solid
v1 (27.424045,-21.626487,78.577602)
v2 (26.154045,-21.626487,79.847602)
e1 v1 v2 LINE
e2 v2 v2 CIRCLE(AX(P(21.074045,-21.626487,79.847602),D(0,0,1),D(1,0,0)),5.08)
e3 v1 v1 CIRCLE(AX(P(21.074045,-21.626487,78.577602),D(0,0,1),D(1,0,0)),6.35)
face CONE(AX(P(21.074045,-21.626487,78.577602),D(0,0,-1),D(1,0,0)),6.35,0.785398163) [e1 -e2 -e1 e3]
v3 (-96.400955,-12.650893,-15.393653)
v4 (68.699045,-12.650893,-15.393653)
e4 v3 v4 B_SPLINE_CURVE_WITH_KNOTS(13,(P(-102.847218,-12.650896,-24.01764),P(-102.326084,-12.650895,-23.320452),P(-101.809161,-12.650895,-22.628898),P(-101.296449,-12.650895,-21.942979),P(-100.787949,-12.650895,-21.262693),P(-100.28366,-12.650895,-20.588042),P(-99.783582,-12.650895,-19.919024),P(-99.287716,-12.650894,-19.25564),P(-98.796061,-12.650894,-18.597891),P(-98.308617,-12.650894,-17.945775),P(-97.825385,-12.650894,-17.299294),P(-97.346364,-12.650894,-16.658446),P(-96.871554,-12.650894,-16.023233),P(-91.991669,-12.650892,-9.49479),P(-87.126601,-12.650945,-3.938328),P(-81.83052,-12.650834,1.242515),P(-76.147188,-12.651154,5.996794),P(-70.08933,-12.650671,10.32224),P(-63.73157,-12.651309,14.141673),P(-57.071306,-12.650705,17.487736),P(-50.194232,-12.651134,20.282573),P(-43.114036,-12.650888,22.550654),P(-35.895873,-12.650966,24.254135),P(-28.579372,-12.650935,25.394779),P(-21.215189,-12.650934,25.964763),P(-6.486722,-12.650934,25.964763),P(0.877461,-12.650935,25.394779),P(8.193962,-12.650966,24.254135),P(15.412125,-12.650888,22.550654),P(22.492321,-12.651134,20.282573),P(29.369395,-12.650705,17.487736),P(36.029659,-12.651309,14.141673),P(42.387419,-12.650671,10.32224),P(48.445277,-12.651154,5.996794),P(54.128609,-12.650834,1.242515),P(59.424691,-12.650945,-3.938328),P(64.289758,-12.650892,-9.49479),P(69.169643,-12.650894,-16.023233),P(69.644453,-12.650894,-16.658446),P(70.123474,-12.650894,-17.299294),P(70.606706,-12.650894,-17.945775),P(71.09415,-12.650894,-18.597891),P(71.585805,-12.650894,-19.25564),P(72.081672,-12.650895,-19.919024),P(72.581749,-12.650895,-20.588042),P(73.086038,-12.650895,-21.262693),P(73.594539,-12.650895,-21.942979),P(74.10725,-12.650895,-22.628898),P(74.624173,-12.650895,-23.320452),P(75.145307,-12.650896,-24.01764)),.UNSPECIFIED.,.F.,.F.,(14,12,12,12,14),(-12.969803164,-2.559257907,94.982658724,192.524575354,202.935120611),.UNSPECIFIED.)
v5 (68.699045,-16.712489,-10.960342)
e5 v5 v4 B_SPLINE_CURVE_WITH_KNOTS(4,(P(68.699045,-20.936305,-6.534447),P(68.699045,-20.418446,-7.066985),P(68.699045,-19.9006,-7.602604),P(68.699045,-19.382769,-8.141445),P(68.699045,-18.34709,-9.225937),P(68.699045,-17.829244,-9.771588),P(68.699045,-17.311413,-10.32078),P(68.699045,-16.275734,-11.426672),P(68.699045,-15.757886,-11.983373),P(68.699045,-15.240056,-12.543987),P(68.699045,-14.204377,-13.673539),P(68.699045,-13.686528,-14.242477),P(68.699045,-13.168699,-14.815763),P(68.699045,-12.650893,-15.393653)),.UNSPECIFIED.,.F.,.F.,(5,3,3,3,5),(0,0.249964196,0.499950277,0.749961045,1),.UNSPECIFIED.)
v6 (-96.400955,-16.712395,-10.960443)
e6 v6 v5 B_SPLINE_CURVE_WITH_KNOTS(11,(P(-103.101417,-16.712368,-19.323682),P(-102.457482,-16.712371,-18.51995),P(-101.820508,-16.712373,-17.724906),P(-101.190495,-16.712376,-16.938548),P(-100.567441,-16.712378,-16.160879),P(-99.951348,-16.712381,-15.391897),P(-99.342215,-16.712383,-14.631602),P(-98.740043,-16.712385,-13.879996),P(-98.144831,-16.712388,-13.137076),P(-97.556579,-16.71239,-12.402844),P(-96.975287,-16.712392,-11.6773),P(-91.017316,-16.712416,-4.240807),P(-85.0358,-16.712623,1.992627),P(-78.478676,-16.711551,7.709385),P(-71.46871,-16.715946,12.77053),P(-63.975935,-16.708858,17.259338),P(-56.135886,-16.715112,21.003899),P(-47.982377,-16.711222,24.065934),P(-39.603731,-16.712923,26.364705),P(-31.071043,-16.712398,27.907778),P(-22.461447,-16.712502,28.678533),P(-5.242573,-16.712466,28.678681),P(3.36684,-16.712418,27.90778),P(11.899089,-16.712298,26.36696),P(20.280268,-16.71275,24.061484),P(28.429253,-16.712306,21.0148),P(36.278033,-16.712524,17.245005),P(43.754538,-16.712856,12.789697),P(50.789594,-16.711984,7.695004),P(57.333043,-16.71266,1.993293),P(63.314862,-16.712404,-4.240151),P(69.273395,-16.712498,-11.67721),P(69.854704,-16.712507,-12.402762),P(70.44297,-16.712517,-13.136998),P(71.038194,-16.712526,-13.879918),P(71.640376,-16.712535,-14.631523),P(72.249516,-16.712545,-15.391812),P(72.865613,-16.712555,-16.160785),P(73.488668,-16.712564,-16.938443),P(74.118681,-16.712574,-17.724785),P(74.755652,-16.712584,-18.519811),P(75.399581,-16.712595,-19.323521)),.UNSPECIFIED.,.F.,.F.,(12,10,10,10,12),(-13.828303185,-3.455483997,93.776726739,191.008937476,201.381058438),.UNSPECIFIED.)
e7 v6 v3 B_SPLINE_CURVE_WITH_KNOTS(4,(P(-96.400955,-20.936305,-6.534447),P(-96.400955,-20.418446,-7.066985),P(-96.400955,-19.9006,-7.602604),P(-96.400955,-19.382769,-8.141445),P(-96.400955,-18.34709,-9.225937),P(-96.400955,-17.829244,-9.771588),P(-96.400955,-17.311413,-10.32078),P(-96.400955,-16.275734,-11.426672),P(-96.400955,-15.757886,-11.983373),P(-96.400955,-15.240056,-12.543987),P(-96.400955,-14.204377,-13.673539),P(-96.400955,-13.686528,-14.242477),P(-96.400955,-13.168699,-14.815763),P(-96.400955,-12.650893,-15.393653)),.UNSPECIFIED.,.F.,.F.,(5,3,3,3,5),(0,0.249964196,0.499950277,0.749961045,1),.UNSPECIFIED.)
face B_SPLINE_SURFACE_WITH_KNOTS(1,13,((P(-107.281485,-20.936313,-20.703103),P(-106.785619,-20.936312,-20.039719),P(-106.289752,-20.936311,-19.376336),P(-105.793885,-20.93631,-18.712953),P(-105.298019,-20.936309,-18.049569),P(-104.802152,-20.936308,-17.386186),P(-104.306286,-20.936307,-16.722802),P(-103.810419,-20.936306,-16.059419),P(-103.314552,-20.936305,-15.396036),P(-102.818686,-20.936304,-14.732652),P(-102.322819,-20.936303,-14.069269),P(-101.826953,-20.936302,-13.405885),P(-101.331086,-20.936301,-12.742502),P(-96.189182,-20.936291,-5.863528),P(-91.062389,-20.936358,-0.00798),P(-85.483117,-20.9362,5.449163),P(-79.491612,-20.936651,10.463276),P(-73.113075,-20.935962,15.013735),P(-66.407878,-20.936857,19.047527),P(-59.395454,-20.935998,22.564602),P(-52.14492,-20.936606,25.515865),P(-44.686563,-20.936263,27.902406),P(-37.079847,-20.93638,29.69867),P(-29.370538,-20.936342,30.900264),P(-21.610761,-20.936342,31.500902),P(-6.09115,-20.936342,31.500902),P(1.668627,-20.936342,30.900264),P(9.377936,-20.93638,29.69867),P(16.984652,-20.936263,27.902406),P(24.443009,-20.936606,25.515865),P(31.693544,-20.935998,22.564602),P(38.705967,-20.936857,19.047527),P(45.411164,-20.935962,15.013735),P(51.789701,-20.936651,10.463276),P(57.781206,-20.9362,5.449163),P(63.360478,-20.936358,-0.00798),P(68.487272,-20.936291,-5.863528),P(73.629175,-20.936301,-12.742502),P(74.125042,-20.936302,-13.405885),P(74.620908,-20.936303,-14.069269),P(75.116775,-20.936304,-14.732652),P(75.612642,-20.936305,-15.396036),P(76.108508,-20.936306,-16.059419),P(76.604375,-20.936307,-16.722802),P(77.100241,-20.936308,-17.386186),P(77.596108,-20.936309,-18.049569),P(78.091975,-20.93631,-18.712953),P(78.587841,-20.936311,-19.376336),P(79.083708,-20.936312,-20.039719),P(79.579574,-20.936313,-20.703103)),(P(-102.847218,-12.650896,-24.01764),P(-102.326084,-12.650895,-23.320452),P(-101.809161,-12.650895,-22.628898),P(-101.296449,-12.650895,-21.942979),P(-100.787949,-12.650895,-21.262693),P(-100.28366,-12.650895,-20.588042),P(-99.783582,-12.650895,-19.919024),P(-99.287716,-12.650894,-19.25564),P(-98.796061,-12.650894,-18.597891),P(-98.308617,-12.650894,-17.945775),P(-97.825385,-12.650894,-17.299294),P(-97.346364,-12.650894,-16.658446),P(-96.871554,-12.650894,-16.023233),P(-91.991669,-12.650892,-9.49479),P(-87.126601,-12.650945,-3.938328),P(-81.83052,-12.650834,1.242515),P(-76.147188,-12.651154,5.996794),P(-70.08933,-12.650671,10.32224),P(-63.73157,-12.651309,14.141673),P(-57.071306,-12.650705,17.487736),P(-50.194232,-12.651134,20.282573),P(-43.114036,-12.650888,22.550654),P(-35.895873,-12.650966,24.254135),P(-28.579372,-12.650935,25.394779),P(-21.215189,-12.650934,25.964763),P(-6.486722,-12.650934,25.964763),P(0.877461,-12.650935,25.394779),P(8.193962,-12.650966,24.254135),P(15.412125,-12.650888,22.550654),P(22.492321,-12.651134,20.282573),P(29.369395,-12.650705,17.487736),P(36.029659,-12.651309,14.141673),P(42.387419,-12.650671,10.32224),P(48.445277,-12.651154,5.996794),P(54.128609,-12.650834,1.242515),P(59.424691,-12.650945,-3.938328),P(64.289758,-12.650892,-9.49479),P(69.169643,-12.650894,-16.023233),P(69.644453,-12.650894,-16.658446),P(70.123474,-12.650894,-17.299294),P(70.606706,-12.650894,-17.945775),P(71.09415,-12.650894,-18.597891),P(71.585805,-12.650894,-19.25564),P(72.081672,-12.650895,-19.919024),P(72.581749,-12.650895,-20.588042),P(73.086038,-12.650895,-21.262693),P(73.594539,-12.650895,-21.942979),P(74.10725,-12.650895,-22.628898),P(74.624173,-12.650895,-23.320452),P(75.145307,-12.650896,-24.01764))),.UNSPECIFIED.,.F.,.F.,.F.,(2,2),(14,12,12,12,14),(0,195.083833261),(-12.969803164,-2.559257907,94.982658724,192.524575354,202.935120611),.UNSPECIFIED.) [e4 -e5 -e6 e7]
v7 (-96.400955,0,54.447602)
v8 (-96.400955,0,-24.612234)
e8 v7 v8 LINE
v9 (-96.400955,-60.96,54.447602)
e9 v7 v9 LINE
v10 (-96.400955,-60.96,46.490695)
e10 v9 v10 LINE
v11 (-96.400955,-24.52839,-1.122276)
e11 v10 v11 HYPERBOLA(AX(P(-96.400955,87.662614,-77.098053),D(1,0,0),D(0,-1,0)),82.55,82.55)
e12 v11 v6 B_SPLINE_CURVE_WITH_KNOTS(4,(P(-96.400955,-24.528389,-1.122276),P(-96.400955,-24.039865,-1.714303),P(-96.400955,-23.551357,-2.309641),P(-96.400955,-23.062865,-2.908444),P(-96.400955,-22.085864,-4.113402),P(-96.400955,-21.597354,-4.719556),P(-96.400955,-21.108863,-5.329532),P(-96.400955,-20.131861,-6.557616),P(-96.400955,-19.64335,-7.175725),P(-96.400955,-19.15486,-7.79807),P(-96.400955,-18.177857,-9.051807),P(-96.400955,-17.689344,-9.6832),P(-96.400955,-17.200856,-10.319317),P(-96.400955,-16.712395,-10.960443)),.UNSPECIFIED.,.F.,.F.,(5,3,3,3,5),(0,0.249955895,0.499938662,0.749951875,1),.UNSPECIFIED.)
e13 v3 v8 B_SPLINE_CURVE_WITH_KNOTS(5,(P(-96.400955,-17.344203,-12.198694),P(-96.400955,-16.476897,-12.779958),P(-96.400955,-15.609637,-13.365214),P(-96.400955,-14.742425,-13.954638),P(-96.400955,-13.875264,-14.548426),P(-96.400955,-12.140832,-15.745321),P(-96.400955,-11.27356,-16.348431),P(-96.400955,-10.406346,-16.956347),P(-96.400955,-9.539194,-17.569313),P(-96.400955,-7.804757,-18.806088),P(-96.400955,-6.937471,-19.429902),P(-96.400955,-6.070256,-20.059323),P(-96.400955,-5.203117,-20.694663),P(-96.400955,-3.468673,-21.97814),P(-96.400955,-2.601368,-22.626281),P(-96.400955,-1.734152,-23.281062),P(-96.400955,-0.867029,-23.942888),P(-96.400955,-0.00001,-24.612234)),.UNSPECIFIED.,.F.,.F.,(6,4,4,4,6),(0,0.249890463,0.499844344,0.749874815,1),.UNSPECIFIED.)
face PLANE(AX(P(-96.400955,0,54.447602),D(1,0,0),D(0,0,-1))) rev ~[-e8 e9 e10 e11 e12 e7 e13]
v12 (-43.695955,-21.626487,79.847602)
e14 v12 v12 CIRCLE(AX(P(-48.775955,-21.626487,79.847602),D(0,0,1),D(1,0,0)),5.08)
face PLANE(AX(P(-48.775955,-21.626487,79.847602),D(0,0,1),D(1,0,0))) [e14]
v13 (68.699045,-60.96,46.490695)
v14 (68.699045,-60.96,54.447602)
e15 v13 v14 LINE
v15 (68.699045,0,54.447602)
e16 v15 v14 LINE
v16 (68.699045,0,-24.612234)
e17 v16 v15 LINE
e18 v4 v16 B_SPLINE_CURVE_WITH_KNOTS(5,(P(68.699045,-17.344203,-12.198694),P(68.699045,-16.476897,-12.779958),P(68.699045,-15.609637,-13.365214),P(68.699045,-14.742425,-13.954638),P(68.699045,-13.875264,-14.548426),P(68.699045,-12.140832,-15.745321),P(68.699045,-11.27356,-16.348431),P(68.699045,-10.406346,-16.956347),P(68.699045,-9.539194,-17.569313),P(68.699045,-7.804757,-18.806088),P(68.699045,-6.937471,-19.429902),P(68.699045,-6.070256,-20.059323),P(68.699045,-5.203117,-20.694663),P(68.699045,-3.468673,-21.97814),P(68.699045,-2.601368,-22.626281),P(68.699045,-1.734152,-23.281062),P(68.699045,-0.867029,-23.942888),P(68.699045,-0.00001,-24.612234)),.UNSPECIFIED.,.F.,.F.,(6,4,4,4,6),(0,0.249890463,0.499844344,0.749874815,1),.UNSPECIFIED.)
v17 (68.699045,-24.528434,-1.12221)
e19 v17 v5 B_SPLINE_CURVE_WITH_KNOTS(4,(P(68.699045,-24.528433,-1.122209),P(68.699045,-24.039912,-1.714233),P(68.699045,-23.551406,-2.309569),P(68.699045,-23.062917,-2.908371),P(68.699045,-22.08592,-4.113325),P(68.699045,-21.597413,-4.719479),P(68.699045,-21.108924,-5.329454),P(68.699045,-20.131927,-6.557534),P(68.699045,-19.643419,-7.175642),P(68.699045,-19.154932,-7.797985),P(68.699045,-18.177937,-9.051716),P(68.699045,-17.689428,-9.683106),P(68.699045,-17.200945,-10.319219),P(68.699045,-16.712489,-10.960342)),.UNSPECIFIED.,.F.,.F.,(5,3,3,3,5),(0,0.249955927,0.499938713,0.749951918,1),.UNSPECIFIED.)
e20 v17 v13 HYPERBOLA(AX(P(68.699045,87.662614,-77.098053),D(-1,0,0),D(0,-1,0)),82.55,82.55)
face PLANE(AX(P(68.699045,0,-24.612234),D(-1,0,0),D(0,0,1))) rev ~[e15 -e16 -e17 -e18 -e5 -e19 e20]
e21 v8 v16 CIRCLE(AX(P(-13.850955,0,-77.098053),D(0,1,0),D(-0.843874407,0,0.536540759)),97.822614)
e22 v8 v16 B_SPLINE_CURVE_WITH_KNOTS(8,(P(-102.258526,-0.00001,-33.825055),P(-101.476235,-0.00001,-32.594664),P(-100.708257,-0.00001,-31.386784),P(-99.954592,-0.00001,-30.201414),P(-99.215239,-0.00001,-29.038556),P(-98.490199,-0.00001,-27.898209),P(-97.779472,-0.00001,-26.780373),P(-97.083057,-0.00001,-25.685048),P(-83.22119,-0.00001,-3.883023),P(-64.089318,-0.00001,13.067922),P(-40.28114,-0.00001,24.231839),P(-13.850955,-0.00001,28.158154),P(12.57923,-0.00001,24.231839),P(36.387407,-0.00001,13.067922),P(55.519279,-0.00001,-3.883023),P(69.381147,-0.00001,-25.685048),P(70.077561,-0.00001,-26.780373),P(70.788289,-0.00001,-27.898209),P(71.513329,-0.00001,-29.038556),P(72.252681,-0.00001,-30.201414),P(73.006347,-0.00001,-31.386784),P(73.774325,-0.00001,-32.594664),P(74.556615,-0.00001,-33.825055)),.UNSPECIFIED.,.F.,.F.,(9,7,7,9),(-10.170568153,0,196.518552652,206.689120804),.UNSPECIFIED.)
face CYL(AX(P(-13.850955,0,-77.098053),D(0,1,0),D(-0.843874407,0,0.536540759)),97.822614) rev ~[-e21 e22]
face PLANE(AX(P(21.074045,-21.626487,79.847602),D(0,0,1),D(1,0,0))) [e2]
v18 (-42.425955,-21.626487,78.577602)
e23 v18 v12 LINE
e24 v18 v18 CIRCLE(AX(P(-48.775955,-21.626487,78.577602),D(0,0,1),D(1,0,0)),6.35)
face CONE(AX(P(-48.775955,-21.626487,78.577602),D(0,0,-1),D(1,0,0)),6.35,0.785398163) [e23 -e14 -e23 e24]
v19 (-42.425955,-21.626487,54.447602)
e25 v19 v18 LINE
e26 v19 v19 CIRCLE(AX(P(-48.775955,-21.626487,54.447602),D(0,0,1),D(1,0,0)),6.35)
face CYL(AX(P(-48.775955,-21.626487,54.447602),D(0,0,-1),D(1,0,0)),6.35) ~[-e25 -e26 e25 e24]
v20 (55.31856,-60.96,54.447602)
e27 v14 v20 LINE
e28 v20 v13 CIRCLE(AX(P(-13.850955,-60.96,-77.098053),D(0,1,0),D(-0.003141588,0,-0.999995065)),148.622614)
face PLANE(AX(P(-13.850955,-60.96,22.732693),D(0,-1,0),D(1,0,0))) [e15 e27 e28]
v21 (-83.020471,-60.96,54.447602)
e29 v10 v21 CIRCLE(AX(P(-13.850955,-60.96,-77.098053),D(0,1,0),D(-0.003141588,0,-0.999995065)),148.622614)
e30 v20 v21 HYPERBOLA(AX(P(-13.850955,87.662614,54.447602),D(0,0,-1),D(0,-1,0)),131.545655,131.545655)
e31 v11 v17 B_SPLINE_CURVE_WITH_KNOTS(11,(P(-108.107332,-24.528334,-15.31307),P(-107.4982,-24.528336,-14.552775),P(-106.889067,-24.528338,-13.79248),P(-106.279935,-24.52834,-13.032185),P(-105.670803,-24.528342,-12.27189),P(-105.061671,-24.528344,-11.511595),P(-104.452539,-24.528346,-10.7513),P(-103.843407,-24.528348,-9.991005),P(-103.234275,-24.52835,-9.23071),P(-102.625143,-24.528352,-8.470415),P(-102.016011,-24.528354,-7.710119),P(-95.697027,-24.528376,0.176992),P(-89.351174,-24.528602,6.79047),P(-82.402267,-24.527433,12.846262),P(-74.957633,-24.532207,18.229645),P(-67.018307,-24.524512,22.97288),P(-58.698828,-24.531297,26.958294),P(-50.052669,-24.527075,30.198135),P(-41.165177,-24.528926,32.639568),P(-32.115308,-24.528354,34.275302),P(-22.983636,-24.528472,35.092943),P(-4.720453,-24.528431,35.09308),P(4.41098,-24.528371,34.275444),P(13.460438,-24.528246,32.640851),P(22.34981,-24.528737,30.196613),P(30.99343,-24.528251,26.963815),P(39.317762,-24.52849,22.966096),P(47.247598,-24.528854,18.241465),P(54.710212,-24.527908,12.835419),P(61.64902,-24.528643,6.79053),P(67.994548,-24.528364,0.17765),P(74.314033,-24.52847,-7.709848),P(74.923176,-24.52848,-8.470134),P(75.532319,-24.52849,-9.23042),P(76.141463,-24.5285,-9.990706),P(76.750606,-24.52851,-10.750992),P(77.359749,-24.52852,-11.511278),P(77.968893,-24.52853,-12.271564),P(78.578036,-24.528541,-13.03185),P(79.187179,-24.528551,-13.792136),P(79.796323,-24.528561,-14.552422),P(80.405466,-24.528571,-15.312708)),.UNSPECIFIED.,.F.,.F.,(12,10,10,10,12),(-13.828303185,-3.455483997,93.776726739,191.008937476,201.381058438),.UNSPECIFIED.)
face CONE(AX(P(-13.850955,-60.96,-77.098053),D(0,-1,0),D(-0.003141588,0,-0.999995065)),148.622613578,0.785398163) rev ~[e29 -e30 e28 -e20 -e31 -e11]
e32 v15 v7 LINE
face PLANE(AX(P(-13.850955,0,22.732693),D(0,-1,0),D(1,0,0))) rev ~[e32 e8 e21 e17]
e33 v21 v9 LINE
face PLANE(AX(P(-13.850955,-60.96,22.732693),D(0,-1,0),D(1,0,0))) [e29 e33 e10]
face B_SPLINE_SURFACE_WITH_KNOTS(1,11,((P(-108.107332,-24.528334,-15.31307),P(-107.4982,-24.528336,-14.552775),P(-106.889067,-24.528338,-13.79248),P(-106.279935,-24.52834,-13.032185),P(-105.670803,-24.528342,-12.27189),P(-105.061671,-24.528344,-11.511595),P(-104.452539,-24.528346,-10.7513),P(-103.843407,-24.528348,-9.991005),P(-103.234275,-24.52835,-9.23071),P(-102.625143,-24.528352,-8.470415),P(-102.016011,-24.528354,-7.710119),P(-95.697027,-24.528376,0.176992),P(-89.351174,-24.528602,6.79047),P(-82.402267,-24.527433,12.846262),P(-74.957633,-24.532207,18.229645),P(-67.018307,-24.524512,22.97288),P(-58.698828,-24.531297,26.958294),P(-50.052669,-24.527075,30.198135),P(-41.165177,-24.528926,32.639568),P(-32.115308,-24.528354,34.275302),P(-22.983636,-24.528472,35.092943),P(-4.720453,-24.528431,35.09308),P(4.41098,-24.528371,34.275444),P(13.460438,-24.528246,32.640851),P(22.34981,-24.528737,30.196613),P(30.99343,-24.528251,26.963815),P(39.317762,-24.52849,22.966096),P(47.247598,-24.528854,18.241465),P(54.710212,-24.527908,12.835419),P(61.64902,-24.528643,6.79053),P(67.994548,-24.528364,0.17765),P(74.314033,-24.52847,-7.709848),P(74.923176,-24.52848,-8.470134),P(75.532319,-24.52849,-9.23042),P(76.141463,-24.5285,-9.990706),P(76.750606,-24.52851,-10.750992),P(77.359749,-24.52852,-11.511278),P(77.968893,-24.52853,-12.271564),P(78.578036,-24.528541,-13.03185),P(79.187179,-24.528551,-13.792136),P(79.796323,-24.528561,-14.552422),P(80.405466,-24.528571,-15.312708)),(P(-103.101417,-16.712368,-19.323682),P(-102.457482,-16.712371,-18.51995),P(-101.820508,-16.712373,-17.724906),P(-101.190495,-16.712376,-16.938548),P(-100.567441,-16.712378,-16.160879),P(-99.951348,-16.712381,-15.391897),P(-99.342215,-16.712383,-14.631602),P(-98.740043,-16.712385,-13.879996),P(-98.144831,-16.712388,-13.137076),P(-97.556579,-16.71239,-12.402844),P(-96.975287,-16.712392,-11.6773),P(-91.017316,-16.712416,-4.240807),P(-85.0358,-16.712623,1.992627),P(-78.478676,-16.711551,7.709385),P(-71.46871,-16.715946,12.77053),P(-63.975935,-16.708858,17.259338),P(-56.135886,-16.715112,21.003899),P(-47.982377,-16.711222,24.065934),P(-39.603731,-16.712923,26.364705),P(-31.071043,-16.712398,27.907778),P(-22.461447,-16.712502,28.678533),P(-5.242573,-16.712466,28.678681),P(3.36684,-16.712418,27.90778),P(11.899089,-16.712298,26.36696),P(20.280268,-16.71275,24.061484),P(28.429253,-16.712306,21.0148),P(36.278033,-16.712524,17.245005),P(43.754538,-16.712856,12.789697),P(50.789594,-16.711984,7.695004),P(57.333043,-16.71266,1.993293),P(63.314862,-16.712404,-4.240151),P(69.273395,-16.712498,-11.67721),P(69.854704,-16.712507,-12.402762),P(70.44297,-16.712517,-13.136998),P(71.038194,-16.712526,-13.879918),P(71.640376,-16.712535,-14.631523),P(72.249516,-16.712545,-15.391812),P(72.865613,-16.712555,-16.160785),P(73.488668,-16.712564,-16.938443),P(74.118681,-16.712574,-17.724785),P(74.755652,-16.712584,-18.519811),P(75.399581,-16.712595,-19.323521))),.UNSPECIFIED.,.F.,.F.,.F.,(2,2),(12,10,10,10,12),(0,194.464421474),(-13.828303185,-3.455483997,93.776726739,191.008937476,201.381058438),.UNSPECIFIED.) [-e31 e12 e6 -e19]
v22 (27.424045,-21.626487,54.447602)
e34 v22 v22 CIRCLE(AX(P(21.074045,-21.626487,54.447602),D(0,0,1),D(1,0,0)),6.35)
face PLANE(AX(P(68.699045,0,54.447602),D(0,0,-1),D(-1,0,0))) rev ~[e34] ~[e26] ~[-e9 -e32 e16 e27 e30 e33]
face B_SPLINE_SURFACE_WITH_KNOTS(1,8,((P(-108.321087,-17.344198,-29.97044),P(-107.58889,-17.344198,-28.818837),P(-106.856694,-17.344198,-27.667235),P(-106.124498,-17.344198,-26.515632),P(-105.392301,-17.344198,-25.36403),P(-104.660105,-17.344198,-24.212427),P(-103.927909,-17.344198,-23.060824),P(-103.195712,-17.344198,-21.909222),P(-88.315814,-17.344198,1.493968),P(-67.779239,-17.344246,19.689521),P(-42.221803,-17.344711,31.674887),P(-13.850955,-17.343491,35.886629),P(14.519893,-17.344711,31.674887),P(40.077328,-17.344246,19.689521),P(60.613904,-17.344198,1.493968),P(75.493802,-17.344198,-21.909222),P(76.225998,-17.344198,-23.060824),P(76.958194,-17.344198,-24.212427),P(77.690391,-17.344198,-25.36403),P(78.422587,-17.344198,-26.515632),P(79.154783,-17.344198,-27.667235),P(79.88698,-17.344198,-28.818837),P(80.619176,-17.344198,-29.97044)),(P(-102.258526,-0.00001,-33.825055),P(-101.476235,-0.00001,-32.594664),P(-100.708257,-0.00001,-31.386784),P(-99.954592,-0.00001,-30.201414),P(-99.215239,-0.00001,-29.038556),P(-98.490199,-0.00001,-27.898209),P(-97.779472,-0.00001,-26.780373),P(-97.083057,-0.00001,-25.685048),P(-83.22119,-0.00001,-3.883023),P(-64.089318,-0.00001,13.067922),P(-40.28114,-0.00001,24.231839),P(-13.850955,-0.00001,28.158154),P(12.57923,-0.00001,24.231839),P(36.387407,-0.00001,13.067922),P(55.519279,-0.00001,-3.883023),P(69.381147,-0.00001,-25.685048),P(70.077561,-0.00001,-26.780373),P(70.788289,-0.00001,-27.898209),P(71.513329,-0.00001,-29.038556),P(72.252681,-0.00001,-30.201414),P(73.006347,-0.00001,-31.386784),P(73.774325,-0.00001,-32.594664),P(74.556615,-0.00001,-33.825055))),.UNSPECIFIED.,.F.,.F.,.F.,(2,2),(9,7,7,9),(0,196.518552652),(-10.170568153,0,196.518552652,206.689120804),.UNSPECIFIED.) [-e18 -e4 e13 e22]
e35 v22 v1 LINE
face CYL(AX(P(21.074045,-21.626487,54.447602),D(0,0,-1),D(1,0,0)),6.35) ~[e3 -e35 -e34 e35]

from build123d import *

# Parameters (mm, degrees)
F1_DEPTH    = 60.96
F2_T2_ANGLE = 359.64
F3_SIZE     = 10.15999
F4_R        = 6.35
F5_DEPTH    = 25.4
F6_SIZE     = 1.27
F7_SIZE     = 5.08
F8_SIZE     = 5.08


# Not quite as in the source:
# - a fillet or chamfer that OpenCascade refuses, or shapes differently, is made with other operations: its cross-section is extruded or revolved along the edge and cut away or added
# - a fillet or chamfer is up to 0.001 mm smaller than in the source, because OpenCascade refuses the exact size


with BuildPart() as f1:
    # F0 (on Front) → F1 (new body)
    with BuildSketch(Plane.XZ):
        with BuildLine():
            Line((68.6990445861, 54.4476021031), (0, 54.4476021031))
            Line((0, 54.4476021031), (-96.4009554139, 54.4476021031))
            Line((-96.4009554139, 54.4476021031), (-96.4009554139, -24.6122339721))
            ThreePointArc((-96.4009554139, -24.6122339721), (-13.8509554139, 20.7245603096), (68.6990445861, -24.6122339721))
            Line((68.6990445861, -24.6122339721), (68.6990445861, 54.4476021031))
        make_face()
    extrude(amount=F1_DEPTH)

    # F2: chamfer of 50.8 on 1 edges, made by hand

    # F2_s1 → F2_t2 (revolve, cut)
    with BuildSketch(Plane(origin=(-13.6086096269, 0, 0.0427528487), x_dir=(0, 1, 0), z_dir=(0.9999950652, 0, -0.0031415875))):
        Polygon((-60.96, -225.7638003707), (-10.16, -174.9638003707), (-60.96, -174.9638003707), align=None)
    revolve(axis=Axis((-13.8509554139, -60.96, -77.0980532681), (0, 1, 0)), revolution_arc=F2_T2_ANGLE, mode=Mode.SUBTRACT)

    # F3 (size 10.16 in the source; OpenCascade refuses exactly that, so slightly less here)
    f3_edges = [f1.edges().sort_by_distance(p)[0] for p in [
        (-13.850955, -10.16, 20.72456),
    ]]
    chamfer(f3_edges, length=F3_SIZE)

    # F4 (on face) → F5 (join)
    with BuildSketch(Plane.XY.offset(54.4476021031)):
        with Locations((-48.7759554139, -21.6264873743)):
            Circle(F4_R)
        with Locations((21.0740445861, -21.6264873743)):
            Circle(F4_R)
    extrude(amount=F5_DEPTH)

    # F6
    f6_edges = [f1.edges().sort_by_distance(p)[0] for p in [
        (-55.125955, -21.626487, 79.847602),
        (14.724045, -21.626487, 79.847602),
    ]]
    chamfer(f6_edges, length=F6_SIZE)

    # F7
    f7_edges = [f1.edges().sort_by_distance(p)[0] for p in [
        (-13.850955, -17.344239, 27.9088),
    ]]
    chamfer(f7_edges, length=F7_SIZE)

    # F8
    f8_edges = [f1.edges().sort_by_distance(p)[0] for p in [
        (-13.850955, -20.936342, 31.500902),
    ]]
    chamfer(f8_edges, length=F8_SIZE)


solid = f1.part
